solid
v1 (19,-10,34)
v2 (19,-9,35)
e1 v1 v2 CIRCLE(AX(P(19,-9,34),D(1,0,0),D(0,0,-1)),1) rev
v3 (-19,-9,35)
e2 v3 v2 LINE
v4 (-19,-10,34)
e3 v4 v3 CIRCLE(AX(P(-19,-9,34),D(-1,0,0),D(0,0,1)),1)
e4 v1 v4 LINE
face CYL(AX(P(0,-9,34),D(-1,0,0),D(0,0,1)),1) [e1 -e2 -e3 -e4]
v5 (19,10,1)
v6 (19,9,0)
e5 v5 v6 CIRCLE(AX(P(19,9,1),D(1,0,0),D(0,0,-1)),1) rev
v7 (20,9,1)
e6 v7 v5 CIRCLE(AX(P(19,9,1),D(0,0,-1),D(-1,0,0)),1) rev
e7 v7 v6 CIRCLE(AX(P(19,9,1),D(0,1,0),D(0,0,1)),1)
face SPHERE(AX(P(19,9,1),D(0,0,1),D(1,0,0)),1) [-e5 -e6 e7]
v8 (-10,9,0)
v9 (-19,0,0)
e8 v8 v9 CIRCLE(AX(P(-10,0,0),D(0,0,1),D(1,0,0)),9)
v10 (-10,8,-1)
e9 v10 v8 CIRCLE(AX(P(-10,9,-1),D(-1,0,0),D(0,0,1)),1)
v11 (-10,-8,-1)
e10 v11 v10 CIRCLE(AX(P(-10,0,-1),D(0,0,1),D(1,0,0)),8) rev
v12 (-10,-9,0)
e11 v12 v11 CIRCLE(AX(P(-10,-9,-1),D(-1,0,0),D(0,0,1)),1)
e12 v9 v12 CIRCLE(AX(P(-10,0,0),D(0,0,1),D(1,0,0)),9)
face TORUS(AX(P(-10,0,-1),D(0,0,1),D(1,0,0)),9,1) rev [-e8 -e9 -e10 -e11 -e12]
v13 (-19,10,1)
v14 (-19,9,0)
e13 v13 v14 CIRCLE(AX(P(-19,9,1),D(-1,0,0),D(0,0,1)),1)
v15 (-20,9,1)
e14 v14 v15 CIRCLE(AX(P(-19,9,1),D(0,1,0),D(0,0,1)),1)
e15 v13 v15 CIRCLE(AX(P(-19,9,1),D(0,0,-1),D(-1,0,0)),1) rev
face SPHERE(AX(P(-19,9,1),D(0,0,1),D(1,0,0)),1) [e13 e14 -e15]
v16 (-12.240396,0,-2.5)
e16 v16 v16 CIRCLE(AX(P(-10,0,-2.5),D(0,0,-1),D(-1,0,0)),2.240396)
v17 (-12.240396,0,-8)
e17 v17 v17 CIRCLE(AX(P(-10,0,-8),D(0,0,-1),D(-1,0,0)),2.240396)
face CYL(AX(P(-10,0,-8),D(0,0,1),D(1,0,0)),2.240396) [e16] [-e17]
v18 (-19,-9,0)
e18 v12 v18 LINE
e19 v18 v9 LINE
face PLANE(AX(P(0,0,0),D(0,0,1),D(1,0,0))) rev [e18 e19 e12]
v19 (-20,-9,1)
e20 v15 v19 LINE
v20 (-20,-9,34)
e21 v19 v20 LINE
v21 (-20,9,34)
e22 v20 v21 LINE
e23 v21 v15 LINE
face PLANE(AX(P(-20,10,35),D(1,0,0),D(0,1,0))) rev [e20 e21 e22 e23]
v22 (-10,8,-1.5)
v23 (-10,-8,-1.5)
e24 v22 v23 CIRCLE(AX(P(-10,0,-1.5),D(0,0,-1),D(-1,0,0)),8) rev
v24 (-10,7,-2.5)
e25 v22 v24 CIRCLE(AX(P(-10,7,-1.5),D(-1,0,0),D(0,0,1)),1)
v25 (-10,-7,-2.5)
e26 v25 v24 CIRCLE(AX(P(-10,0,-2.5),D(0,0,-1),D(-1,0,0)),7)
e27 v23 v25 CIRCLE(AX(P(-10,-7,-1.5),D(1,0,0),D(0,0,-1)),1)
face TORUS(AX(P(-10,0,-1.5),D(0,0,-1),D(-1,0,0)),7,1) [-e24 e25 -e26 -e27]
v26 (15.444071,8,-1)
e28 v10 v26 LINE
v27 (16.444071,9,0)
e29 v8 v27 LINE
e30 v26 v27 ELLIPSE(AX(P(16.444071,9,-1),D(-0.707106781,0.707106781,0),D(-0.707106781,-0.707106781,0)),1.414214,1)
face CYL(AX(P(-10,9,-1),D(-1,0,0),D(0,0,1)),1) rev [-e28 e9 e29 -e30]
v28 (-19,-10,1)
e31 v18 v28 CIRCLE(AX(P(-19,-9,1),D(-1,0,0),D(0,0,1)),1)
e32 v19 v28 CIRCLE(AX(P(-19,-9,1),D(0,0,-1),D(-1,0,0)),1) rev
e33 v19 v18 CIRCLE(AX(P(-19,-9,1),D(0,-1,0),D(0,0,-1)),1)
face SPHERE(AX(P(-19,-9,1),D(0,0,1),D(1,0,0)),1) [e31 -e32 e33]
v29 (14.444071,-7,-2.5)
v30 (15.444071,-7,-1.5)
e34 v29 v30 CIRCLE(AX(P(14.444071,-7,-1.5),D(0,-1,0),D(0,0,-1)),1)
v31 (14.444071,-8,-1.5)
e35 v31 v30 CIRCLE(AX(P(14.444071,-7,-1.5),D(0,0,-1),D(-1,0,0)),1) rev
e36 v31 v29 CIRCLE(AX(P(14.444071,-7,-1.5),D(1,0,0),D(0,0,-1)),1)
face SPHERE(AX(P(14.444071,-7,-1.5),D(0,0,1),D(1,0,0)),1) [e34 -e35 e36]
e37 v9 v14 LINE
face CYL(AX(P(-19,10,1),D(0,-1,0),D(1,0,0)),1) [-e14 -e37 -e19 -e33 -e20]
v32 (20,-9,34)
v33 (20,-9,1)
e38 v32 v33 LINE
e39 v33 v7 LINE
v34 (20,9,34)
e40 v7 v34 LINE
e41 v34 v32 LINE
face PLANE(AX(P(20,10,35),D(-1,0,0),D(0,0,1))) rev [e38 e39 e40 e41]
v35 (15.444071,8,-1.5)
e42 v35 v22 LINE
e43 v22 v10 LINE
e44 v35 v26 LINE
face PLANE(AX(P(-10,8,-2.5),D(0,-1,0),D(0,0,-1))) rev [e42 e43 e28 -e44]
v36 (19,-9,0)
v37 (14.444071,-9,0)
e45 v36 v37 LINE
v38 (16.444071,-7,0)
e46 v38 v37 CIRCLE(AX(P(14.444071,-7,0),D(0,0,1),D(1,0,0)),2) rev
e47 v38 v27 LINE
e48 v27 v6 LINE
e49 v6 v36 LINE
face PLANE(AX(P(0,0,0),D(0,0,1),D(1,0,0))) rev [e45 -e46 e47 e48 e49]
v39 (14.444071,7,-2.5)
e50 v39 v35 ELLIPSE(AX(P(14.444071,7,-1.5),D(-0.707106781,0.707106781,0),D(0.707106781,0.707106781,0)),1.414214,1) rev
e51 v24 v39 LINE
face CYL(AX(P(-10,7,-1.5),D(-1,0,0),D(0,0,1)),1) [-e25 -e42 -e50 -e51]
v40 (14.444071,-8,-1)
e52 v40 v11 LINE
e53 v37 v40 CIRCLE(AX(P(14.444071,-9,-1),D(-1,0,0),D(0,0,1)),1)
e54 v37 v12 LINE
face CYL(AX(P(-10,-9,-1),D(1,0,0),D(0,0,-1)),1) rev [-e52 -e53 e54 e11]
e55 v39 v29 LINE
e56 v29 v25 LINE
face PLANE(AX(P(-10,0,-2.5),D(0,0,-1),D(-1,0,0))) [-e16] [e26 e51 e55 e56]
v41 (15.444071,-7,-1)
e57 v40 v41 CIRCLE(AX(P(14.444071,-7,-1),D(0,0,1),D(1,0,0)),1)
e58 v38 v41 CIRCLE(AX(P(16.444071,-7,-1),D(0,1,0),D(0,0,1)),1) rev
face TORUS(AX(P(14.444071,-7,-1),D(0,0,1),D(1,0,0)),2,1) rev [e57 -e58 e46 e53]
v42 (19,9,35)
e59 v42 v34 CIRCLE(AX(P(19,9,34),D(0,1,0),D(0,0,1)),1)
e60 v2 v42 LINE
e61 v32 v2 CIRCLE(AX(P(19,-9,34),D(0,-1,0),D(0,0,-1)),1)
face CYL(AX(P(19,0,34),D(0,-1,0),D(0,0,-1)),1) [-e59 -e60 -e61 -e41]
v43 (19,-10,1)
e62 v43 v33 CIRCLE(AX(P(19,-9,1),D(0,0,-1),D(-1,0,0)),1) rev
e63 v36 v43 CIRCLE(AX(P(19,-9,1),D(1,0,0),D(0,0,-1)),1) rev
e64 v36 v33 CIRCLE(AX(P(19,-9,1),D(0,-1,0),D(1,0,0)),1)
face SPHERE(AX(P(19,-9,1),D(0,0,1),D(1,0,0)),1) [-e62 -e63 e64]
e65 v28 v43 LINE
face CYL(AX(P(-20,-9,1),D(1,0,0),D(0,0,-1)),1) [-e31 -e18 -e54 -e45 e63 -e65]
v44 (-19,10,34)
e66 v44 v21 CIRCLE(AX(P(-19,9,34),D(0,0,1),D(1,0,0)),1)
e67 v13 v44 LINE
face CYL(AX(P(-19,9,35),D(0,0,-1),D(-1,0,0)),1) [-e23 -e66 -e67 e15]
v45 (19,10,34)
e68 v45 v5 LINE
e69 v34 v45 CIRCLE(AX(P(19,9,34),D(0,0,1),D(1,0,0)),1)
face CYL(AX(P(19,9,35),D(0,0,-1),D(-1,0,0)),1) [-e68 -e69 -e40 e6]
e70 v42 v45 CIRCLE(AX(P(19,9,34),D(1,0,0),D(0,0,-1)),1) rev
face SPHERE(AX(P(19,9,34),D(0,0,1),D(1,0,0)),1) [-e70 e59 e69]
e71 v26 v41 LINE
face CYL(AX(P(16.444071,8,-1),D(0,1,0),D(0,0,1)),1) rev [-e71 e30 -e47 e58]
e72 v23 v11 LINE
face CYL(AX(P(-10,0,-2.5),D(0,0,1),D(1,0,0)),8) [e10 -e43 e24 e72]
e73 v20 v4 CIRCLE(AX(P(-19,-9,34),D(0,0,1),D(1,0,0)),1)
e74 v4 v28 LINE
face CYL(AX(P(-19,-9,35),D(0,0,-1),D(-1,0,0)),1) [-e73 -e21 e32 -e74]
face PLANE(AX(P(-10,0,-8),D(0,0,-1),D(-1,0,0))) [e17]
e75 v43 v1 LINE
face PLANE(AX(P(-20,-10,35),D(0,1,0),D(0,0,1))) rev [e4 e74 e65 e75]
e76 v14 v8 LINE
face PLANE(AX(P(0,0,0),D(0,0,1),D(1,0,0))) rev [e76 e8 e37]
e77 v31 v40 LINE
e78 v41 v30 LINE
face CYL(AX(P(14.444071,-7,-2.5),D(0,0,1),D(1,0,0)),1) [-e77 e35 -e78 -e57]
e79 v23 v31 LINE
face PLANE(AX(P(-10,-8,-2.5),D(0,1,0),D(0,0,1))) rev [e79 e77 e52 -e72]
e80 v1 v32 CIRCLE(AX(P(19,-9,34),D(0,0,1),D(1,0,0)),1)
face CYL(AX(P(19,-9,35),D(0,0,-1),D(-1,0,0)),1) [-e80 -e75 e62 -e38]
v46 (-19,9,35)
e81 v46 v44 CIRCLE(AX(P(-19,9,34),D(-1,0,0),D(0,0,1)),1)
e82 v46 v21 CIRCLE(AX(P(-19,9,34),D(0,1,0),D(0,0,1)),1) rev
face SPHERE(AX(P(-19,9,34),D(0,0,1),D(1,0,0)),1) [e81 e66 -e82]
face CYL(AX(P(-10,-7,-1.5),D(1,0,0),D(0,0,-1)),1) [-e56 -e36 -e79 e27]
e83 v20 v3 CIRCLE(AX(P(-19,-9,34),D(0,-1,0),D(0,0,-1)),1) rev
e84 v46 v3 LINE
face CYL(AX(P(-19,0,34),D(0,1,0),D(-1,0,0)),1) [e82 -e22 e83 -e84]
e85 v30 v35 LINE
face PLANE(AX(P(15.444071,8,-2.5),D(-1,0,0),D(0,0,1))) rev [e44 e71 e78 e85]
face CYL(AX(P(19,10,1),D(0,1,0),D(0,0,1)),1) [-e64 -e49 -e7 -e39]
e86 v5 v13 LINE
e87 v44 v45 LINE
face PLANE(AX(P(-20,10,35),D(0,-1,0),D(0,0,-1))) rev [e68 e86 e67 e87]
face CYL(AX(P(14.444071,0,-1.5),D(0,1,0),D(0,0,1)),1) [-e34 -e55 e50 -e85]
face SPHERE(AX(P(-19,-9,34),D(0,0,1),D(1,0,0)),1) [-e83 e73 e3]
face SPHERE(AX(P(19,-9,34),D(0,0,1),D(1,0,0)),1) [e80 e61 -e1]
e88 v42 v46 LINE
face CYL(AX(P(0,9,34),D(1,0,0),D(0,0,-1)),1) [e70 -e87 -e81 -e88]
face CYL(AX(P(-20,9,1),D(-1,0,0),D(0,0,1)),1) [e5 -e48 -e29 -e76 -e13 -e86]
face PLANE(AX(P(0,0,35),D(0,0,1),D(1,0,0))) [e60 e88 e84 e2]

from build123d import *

# Parameters (mm, degrees)
SKETCH_1_W      = 40
SKETCH_1_H      = 20
EXTRUDE_1_DEPTH = 35
FILLET_1_R      = 1
SKETCH_2_R      = 2.240395976
EXTRUDE_2_DEPTH = 8
EXTRUDE_3_DEPTH = 2.5
FILLET_2_R      = 1


with BuildPart() as part:
    # 草图1 → 凸台-拉伸1 (new body)
    with BuildSketch(Plane.XY):
        Rectangle(SKETCH_1_W, SKETCH_1_H)
    extrude(amount=EXTRUDE_1_DEPTH)

    # 圆角1
    fillet_1_edges = [part.edges().sort_by_distance(p)[0] for p in [
        (-20, 0, 35),
        (0, -10, 35),
        (20, 0, 35),
        (0, -10, 0),
        (-20, 0, 0),
        (0, 10, 0),
        (20, 0, 0),
        (0, 10, 35),
        (20, -10, 17.5),
        (-20, -10, 17.5),
        (-20, 10, 17.5),
        (20, 10, 17.5),
    ]]
    fillet(fillet_1_edges, radius=FILLET_1_R)

    # 草图2 → 凸台-拉伸2 (add)
    with BuildSketch(Plane(origin=(0, 0, 0), x_dir=(-1, 0, 0), z_dir=(0, 0, -1))):
        with Locations(Location((10, 0, 0), (0, 0, 180))):
            Circle(SKETCH_2_R)
    extrude(amount=EXTRUDE_2_DEPTH)

    # 草图3 → 凸台-拉伸3 (add)
    with BuildSketch(Plane(origin=(0, 0, 0), x_dir=(-1, 0, 0), z_dir=(0, 0, -1))):
        with BuildLine():
            Line((-15.444071046, 8), (-15.444071046, -8))
            Line((-15.444071046, -8), (10, -8))
            ThreePointArc((10, -8), (18, 0), (10, 8))
            Line((10, 8), (-15.444071046, 8))
        make_face()
    extrude(amount=EXTRUDE_3_DEPTH)

    # 圆角2
    fillet_2_edges = [part.edges().sort_by_distance(p)[0] for p in [
        (-18, 0, 0),
        (2.722035523, 8, 0),
        (15.444071046, 0, 0),
        (2.722035523, -8, 0),
        (15.444071046, -8, -1.25),
        (-18, 0, -2.5),
        (2.722035523, 8, -2.5),
        (15.444071046, 0, -2.5),
        (2.722035523, -8, -2.5),
    ]]
    fillet(fillet_2_edges, radius=FILLET_2_R - 0.0001)  # a hair under: the kernel refuses the full size


solid = part.part
